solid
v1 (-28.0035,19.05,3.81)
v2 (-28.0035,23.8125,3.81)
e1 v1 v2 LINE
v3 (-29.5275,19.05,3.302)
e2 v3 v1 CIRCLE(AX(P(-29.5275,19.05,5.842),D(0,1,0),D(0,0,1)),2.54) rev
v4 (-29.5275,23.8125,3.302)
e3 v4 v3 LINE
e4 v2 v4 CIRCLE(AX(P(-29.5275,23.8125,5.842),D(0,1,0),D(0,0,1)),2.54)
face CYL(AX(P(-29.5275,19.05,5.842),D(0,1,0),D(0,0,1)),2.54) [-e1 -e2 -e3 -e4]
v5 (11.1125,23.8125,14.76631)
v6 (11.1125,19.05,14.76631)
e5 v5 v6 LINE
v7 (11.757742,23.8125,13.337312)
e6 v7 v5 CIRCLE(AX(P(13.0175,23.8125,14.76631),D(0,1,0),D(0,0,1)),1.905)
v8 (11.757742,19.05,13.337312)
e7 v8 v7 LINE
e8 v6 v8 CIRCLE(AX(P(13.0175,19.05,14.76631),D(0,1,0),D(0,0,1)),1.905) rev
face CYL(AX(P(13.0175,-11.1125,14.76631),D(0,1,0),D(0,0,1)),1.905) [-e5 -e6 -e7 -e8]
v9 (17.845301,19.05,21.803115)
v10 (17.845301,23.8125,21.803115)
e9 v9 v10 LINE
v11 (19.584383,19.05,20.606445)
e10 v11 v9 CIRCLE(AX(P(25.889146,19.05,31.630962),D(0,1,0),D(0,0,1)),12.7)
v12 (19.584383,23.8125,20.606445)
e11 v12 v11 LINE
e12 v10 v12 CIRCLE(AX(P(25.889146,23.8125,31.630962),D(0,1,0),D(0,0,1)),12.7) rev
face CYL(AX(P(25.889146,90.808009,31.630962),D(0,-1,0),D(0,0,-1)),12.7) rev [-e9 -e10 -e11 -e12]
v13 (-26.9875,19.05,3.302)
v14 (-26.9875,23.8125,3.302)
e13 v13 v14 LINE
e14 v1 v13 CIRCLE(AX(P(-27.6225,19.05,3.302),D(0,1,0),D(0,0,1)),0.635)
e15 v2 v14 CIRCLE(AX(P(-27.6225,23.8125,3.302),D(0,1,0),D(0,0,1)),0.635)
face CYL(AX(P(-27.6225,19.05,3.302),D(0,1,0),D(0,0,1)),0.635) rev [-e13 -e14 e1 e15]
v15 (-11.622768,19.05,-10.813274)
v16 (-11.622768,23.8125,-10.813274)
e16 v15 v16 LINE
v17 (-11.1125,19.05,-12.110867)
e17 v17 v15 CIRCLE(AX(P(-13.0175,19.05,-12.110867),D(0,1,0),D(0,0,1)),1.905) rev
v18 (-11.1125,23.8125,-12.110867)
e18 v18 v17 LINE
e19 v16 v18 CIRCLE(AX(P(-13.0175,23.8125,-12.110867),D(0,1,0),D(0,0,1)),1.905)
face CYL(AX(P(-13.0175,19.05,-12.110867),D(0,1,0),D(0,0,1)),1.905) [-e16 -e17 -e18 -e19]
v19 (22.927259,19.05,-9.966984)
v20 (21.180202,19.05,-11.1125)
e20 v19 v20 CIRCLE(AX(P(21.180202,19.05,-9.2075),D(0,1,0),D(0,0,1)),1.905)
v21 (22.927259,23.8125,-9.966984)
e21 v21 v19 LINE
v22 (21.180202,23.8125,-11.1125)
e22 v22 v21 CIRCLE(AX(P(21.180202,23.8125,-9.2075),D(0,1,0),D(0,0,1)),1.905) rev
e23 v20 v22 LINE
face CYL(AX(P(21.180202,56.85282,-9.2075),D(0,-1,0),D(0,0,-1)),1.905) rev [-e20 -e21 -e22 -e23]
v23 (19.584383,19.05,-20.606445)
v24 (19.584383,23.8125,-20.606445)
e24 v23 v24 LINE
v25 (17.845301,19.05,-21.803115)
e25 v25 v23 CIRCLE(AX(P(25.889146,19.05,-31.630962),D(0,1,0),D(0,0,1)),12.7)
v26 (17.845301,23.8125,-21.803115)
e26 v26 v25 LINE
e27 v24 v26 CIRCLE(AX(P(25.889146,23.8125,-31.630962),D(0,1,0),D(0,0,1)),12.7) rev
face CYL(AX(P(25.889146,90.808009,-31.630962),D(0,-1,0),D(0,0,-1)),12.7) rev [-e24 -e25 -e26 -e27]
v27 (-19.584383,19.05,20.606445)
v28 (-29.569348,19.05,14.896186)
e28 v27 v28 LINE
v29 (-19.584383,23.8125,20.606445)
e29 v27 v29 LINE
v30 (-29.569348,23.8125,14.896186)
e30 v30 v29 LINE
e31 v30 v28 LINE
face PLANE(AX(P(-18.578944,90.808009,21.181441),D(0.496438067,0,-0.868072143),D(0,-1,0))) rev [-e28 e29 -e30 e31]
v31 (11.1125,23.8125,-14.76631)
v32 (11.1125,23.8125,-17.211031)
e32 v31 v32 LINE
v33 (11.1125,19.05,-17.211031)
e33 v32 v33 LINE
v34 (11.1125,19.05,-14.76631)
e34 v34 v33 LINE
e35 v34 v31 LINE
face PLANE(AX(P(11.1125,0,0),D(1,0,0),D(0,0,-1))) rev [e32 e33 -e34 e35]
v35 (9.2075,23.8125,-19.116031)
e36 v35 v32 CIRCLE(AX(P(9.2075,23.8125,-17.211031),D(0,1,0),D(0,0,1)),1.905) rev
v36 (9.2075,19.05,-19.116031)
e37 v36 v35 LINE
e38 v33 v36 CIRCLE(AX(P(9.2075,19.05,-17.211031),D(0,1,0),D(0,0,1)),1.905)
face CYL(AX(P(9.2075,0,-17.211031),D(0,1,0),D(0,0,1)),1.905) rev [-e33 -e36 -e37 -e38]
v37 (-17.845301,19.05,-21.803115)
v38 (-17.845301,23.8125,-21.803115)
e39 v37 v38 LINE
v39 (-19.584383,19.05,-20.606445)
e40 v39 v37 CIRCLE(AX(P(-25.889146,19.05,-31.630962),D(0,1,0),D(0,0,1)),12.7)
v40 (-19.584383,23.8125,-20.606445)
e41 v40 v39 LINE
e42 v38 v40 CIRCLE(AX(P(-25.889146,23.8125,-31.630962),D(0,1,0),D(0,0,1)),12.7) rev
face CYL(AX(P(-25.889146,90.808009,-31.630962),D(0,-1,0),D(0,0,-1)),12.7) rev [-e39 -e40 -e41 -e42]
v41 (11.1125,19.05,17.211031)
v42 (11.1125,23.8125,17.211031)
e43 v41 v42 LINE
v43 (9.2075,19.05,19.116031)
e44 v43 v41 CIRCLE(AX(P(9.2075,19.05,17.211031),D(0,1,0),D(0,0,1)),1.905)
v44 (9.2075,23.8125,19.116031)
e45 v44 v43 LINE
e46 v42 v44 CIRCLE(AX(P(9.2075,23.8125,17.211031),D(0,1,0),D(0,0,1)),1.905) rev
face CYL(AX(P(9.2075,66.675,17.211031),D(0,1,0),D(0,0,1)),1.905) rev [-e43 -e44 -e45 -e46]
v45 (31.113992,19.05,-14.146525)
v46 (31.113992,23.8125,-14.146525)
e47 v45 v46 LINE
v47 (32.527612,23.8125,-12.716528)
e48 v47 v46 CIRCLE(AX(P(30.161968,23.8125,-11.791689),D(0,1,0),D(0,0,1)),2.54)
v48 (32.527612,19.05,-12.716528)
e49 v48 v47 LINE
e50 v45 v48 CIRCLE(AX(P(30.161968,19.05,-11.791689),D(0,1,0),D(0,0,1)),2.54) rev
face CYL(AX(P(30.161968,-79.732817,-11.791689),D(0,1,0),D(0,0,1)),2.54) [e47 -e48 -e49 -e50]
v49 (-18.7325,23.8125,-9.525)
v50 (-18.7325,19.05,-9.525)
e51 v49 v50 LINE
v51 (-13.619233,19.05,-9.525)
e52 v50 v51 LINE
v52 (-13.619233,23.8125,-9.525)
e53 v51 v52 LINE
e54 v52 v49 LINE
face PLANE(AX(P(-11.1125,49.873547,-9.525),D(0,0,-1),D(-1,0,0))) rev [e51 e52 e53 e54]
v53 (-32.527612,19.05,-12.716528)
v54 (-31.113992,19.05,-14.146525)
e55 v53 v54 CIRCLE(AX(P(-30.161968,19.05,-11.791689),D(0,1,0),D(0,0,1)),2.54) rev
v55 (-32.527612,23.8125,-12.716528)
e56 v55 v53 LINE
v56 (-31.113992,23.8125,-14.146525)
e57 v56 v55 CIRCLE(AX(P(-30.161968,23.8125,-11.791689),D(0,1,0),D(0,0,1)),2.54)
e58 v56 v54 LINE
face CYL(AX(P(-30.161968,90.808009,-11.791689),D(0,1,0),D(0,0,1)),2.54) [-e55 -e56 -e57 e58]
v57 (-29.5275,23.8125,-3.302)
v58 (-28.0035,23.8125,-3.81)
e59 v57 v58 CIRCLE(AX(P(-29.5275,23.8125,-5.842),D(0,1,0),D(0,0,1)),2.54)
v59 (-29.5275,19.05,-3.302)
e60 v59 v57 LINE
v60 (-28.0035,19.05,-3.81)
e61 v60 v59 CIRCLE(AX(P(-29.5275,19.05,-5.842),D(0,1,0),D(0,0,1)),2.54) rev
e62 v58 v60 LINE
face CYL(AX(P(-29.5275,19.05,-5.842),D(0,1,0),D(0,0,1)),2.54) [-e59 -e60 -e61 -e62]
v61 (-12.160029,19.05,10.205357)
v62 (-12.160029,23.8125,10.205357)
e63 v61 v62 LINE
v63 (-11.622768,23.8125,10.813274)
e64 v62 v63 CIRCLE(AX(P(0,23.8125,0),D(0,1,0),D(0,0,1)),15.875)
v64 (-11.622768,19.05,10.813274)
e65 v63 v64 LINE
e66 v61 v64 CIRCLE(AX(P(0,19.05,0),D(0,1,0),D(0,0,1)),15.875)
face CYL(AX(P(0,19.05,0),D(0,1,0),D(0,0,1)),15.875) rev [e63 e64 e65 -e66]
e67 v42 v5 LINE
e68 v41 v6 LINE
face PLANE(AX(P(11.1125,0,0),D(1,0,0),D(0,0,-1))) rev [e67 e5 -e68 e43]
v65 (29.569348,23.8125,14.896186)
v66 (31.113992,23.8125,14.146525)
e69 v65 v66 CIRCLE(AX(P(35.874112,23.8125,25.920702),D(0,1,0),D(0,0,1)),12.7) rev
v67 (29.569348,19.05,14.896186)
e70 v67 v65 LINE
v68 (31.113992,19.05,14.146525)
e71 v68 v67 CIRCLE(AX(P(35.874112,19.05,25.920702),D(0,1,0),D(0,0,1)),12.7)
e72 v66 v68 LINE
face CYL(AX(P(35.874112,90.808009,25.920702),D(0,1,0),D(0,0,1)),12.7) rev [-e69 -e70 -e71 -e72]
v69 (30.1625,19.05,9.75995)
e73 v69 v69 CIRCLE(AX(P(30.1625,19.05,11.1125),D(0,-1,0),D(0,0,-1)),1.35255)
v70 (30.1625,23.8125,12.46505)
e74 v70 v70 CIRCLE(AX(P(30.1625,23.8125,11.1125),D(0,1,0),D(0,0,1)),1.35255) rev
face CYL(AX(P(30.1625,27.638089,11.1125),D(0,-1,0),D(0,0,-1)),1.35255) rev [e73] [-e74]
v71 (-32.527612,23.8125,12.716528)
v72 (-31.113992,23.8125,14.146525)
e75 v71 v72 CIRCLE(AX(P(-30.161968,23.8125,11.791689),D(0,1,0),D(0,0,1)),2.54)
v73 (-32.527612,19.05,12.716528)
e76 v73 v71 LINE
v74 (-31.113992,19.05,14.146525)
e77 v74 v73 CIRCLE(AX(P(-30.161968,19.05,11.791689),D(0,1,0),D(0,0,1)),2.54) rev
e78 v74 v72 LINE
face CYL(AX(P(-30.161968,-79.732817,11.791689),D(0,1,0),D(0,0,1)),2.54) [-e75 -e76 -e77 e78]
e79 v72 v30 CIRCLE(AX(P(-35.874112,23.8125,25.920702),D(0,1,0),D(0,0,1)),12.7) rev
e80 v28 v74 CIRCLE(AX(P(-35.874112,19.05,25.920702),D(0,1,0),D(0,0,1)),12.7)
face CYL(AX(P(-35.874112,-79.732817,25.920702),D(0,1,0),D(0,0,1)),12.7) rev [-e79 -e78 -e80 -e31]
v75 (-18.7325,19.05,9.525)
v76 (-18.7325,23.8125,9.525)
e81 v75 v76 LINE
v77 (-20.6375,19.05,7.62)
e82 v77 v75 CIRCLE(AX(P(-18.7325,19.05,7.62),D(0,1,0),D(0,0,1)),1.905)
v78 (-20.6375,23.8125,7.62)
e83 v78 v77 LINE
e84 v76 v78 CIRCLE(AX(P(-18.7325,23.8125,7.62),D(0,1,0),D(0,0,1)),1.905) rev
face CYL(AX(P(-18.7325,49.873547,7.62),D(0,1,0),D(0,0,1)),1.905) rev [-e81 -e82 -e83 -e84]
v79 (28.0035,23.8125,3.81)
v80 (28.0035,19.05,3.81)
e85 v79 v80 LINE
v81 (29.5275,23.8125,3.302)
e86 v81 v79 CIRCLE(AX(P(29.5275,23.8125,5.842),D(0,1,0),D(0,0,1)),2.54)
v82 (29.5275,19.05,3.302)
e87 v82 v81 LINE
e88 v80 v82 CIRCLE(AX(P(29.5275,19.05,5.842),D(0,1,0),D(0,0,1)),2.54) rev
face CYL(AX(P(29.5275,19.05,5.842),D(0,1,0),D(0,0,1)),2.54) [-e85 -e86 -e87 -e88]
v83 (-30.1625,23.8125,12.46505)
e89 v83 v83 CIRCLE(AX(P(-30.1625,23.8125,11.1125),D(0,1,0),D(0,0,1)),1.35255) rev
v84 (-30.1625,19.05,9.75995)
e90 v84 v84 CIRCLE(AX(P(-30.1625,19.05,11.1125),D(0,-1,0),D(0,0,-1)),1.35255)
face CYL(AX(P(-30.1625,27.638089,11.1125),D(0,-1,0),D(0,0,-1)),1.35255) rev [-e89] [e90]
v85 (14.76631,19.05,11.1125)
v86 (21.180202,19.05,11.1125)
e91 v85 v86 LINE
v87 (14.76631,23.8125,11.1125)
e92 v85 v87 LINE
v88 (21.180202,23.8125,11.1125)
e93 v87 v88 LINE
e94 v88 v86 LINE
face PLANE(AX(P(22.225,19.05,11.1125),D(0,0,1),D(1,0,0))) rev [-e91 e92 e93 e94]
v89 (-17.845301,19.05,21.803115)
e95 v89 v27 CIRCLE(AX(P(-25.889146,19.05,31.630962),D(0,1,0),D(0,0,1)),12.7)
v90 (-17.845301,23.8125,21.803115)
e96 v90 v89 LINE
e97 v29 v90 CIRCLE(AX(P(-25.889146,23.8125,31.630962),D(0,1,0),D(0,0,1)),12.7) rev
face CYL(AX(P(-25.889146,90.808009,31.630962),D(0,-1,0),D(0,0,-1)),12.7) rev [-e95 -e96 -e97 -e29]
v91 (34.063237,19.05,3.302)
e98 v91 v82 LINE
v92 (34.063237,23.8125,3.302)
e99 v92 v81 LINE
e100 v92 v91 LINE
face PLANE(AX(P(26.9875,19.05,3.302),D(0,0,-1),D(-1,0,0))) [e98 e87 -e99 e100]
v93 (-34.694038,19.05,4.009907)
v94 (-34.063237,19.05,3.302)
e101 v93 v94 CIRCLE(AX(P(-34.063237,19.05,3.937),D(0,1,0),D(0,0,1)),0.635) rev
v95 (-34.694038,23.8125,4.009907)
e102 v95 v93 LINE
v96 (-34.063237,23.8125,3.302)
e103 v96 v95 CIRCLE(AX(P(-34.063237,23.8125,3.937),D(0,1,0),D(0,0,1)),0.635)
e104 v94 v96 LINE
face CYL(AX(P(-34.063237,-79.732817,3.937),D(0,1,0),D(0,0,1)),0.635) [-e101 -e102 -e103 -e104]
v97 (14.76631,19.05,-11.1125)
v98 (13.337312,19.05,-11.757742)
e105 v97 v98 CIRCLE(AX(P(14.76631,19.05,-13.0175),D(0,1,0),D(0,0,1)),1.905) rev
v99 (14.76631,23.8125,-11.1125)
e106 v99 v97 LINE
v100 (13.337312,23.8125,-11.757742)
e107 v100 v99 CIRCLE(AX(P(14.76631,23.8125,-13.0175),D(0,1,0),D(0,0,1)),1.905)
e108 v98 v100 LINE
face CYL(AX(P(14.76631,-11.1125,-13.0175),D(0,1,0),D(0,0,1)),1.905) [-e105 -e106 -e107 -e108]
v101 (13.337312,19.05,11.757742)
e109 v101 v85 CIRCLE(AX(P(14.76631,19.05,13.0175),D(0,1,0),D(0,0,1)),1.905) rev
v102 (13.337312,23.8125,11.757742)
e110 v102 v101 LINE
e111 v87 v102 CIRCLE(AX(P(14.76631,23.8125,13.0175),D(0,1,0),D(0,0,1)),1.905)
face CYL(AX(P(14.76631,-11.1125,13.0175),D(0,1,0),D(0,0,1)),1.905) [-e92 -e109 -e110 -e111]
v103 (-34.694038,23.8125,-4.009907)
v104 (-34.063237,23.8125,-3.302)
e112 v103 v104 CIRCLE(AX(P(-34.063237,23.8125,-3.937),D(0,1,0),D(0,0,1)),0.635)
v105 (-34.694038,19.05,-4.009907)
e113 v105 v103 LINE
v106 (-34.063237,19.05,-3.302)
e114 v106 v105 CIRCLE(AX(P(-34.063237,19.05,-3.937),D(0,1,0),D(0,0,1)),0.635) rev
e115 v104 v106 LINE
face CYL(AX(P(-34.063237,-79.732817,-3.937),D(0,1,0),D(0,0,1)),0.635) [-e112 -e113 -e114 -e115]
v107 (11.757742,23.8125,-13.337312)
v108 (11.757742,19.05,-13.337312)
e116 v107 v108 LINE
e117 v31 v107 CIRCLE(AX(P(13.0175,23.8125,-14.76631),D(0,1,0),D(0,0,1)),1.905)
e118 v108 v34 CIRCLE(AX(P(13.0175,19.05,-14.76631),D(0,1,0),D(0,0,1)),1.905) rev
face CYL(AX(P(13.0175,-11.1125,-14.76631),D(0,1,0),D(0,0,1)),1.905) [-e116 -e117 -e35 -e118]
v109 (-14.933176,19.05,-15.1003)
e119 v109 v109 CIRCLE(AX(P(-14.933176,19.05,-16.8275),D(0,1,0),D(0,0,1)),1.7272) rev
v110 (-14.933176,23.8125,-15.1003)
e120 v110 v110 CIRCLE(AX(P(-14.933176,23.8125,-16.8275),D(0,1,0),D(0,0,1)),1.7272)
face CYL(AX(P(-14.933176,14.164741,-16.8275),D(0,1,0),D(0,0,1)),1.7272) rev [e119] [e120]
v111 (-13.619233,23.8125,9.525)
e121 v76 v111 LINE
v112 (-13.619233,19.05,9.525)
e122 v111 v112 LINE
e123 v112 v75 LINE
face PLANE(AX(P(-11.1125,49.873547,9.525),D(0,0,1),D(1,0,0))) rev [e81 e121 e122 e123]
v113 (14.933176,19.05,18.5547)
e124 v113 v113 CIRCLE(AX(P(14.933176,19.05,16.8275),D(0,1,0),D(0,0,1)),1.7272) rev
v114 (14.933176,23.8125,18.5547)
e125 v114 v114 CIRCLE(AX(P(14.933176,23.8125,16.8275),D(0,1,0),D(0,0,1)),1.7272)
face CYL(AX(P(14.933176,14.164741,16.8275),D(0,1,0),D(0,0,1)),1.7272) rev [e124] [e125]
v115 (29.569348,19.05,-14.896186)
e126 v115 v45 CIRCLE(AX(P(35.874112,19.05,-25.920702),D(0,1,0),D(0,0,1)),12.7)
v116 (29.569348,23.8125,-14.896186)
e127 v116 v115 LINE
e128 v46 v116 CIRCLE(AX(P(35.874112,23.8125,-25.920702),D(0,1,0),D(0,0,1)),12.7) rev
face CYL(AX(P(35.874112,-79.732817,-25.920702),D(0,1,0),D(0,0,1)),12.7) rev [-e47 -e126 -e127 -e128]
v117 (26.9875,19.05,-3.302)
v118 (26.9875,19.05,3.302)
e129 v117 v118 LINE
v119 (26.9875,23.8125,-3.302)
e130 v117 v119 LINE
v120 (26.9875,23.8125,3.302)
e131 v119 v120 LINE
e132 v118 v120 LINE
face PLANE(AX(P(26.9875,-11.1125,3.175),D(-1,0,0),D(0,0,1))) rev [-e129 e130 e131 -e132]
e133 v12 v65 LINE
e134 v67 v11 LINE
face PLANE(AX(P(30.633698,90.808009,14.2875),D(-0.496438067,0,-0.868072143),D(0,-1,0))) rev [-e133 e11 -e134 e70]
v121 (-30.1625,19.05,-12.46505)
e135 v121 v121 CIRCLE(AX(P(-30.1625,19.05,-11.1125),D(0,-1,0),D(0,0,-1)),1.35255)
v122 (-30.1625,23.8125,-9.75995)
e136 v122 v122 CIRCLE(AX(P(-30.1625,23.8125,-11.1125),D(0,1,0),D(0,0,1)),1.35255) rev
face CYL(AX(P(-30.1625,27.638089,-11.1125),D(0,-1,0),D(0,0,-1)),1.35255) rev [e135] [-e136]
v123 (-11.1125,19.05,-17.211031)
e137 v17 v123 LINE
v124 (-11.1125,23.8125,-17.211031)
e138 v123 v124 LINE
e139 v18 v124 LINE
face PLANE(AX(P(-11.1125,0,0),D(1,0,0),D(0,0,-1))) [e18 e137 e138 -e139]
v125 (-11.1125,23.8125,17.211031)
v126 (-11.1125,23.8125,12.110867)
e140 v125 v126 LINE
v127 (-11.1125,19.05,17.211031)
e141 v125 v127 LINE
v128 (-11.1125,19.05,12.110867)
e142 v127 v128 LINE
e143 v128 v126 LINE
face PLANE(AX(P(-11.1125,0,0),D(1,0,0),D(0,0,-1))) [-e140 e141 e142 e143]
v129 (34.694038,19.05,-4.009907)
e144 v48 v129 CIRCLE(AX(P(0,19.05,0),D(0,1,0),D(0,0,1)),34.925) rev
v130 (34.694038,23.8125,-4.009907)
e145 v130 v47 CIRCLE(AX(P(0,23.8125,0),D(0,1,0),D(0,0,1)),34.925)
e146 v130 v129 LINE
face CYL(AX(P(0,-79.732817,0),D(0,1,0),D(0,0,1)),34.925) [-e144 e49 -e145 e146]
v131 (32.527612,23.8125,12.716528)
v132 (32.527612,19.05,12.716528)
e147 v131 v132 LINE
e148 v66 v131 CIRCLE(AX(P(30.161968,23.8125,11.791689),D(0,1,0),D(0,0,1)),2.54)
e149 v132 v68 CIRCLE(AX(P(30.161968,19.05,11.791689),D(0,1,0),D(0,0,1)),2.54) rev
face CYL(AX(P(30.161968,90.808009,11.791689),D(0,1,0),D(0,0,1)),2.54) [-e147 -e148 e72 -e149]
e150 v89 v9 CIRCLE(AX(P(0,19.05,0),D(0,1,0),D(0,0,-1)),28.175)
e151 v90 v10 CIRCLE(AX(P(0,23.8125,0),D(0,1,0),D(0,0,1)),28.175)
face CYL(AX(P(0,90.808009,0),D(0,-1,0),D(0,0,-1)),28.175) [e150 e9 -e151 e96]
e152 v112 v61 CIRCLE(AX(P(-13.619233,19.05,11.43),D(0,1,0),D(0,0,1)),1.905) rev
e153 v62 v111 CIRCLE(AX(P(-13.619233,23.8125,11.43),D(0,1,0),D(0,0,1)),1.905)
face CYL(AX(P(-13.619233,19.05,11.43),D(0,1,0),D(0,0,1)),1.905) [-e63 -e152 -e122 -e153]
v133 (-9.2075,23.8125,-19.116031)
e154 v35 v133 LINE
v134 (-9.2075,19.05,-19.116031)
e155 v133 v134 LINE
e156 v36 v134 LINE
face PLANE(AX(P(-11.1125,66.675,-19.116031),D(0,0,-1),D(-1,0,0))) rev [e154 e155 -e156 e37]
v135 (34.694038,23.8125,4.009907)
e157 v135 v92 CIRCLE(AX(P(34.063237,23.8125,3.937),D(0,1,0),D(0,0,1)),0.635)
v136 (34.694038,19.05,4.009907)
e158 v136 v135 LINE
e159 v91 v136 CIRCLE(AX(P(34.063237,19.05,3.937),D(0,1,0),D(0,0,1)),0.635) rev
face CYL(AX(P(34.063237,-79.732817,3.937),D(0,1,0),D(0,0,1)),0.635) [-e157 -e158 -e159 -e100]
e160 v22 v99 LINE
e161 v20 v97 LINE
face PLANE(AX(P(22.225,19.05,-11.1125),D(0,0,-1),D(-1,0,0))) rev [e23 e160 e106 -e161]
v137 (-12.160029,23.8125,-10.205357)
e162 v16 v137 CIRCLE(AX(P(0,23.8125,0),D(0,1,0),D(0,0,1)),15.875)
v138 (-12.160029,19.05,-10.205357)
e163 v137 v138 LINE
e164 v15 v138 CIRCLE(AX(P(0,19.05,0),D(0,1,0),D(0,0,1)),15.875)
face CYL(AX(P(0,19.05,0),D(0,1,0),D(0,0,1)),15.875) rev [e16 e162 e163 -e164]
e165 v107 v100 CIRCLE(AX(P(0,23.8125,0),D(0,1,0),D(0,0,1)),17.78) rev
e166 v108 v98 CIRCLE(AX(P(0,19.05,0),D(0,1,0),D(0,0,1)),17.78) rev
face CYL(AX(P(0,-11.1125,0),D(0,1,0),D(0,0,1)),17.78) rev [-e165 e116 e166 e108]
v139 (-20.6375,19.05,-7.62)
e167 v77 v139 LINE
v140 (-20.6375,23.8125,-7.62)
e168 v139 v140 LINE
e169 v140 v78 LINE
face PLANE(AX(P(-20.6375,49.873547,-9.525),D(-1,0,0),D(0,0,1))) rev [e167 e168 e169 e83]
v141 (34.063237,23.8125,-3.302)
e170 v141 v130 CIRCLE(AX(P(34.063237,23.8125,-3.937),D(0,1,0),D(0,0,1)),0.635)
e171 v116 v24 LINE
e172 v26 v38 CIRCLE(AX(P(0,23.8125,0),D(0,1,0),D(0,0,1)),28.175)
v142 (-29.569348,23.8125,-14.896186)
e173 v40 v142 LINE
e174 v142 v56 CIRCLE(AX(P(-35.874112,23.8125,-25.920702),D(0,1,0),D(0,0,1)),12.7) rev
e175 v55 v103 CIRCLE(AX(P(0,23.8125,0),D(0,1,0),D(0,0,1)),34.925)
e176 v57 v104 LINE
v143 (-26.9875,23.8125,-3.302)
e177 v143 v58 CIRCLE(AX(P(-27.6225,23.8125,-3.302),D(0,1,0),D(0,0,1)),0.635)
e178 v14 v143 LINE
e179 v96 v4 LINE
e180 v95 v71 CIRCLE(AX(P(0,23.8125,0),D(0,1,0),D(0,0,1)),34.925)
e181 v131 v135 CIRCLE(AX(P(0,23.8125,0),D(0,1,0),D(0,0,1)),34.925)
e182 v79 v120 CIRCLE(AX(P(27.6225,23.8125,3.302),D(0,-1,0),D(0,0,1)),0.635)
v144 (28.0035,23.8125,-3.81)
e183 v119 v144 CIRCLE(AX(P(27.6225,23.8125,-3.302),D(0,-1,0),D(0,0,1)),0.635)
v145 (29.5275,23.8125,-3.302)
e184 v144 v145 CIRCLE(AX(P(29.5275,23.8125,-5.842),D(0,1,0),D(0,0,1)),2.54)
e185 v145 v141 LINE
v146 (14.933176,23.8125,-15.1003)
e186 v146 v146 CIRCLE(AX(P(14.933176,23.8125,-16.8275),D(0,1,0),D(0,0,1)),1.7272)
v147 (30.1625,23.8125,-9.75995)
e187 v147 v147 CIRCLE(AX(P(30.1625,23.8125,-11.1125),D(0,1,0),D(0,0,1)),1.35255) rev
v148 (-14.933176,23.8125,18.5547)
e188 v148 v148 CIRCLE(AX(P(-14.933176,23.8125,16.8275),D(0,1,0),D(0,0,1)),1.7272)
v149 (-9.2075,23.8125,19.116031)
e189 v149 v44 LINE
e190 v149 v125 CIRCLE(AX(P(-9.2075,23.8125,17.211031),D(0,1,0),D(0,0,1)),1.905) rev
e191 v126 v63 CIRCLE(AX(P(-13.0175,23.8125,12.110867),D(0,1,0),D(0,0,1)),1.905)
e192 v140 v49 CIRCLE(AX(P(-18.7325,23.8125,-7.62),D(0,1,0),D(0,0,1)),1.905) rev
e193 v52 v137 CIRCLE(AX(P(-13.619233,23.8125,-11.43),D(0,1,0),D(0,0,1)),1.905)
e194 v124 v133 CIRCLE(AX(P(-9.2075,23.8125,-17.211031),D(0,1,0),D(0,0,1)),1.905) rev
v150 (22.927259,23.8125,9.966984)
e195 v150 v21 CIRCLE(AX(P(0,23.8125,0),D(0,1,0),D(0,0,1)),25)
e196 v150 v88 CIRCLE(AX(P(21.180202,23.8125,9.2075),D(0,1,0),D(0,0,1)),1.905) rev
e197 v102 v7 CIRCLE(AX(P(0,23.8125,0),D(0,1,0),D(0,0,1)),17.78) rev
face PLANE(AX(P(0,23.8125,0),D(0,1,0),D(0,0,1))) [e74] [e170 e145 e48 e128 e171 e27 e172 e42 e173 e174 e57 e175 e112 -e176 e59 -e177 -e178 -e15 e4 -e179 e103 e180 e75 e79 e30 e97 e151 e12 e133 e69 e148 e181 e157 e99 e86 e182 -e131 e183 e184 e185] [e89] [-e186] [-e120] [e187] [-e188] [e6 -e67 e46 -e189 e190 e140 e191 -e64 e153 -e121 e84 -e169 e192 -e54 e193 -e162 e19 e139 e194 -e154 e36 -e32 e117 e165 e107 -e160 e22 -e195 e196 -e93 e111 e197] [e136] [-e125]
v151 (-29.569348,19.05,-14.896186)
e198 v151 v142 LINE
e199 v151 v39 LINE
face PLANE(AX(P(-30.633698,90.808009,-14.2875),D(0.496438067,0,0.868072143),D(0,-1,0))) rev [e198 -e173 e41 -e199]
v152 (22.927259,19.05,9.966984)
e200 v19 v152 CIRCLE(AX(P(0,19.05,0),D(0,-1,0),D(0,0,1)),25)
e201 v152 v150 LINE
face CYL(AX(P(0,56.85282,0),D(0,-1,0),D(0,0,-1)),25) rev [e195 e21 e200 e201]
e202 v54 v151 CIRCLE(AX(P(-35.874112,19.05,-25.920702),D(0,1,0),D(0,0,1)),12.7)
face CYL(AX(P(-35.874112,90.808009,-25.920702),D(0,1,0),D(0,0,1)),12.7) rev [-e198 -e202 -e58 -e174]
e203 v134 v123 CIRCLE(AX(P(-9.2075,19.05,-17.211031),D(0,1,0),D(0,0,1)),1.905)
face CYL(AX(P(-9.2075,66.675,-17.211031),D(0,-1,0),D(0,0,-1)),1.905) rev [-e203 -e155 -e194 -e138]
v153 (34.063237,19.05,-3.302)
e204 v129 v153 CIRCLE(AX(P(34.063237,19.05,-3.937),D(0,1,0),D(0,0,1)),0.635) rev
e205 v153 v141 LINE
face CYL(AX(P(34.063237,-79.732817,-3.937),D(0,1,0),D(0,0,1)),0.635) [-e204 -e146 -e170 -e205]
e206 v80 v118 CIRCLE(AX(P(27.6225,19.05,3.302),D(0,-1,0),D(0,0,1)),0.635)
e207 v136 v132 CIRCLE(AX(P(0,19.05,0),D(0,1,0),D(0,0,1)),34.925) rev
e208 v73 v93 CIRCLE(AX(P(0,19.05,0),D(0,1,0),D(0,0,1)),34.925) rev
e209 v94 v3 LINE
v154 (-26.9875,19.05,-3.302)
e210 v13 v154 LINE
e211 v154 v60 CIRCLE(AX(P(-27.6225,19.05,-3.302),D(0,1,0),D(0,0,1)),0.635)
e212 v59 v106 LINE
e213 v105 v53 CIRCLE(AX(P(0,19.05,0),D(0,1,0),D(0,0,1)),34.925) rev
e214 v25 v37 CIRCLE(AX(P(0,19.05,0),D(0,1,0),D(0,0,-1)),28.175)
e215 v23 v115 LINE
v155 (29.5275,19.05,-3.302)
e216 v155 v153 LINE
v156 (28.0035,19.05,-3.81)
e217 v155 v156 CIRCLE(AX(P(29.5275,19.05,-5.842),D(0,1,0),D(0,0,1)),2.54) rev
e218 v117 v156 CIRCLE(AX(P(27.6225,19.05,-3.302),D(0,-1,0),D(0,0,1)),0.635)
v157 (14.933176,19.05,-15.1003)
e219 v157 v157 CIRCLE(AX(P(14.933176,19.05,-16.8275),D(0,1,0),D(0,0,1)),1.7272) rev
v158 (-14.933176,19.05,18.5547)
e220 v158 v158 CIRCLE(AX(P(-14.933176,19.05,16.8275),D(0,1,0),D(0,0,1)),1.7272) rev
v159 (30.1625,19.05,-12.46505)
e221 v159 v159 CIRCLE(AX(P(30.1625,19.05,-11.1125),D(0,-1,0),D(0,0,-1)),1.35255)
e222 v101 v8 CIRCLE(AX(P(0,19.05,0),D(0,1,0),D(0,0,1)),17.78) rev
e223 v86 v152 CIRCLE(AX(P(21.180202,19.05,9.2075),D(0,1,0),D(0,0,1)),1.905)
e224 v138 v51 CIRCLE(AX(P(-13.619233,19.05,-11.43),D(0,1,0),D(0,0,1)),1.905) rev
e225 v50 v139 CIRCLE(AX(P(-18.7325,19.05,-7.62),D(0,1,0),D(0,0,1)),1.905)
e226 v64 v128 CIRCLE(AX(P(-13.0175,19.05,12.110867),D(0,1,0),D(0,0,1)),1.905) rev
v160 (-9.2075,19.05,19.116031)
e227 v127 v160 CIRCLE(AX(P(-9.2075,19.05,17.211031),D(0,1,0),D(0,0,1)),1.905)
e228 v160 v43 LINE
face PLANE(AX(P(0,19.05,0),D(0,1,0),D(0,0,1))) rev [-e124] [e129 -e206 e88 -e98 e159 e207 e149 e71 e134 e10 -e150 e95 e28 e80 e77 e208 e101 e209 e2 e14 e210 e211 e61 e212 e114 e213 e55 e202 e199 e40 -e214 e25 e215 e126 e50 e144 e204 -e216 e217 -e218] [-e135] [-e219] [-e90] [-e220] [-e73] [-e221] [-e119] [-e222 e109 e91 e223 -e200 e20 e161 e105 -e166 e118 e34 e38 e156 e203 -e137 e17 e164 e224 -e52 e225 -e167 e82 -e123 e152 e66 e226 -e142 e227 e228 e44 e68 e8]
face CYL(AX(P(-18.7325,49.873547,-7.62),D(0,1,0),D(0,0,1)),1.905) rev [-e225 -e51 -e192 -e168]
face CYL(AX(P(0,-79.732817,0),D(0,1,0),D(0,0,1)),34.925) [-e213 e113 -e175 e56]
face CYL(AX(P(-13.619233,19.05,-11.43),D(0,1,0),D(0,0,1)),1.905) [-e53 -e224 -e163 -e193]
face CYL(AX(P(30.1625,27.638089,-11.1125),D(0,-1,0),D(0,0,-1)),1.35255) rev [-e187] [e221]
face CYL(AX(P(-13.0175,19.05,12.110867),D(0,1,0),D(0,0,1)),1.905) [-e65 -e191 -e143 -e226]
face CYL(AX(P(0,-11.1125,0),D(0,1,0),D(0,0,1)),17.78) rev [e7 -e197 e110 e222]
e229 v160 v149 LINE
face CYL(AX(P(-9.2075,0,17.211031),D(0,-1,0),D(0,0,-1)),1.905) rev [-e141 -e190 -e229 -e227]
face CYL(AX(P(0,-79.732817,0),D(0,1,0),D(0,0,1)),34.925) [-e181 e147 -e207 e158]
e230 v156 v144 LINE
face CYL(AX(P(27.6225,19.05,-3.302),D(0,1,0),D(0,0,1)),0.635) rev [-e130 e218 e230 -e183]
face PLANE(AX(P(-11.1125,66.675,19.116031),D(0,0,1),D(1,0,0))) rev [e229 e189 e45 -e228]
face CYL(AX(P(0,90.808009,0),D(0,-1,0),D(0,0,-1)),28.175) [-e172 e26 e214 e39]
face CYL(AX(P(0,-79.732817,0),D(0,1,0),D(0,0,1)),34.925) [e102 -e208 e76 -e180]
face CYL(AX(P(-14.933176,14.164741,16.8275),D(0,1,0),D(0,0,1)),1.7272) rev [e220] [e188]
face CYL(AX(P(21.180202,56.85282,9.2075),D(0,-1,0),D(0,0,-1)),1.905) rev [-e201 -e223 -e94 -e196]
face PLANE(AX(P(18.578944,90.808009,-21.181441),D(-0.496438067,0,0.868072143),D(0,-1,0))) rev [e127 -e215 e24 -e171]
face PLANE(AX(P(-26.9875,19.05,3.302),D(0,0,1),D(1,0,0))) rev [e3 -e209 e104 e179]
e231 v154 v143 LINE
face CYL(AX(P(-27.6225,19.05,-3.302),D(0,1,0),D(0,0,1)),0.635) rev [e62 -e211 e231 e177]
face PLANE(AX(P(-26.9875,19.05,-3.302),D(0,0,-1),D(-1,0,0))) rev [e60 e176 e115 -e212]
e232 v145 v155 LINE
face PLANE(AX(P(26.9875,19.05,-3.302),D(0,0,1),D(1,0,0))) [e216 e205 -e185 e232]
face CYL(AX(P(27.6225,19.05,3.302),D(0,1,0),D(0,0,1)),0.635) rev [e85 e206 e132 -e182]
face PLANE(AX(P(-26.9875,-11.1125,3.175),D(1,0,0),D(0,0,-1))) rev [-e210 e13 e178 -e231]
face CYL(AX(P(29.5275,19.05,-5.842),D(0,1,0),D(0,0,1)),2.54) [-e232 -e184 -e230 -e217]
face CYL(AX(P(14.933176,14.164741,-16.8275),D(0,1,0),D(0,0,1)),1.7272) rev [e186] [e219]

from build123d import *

# Parameters (mm, degrees)
STOCK_DGT_START                               = 19.05
STOCK_DGT_INSIDE_SWERVE_STRUCTURE_SM_2_R      = 1.7272
STOCK_DGT_INSIDE_SWERVE_STRUCTURE_SM_2_R_2    = 1.35255
STOCK_DGT_INSIDE_SWERVE_STRUCTURE_SMALL_DEPTH = 4.7625
SKETCH2_W                                     = 7.792882402
SKETCH2_H                                     = 6.604
CUT_EXTRUDE2_DEPTH                            = 46.013187304
CUT_EXTRUDE1_DEPTH                            = 46.013187304
FILLET1_R                                     = 2.54
FILLET2_R                                     = 2.54
FILLET3_R                                     = 12.7
FILLET4_R                                     = 1.905
FILLET5_R                                     = 0.635


# Read off the part's stored shape, not the designer's step: Stock-DGT inside swerve structure Small Bearing-1
with BuildPart() as part:
    # Stock-DGT inside swerve structure Sm 2 → Stock-DGT inside swerve structure Small Bearing-1 (new body)
    with BuildSketch(Plane(origin=(0, 0, 0), x_dir=(1, 0, 0), z_dir=(0, 1, 0)).offset(STOCK_DGT_START)):
        with BuildLine():
            Line((26.9875, 3.175), (34.780382402, 3.175))
            ThreePointArc((34.780382402, 3.175), (33.784635987, 8.851779269), (31.868840091, 14.2875))
            Line((31.868840091, 14.2875), (30.633697592, 14.2875))
            Line((30.633697592, 14.2875), (18.578944076, 21.181441452))
            ThreePointArc((18.578944076, 21.181441452), (0, 28.175), (-18.578944076, 21.181441452))
            Line((-18.578944076, 21.181441452), (-30.633697592, 14.2875))
            Line((-30.633697592, 14.2875), (-31.868840091, 14.2875))
            ThreePointArc((-31.868840091, 14.2875), (-33.784635987, 8.851779269), (-34.780382402, 3.175))
            Line((-34.780382402, 3.175), (-26.9875, 3.175))
            Line((-26.9875, 3.175), (-26.9875, -3.175))
            Line((-26.9875, -3.175), (-34.780382402, -3.175))
            ThreePointArc((-34.780382402, -3.175), (-33.784635987, -8.851779269), (-31.868840091, -14.2875))
            Line((-31.868840091, -14.2875), (-30.633697592, -14.2875))
            Line((-30.633697592, -14.2875), (-18.578944076, -21.181441452))
            ThreePointArc((-18.578944076, -21.181441452), (0, -28.175), (18.578944076, -21.181441452))
            Line((18.578944076, -21.181441452), (30.633697592, -14.2875))
            Line((30.633697592, -14.2875), (31.868840091, -14.2875))
            ThreePointArc((31.868840091, -14.2875), (33.784635987, -8.851779269), (34.780382402, -3.175))
            Line((34.780382402, -3.175), (26.9875, -3.175))
            Line((26.9875, -3.175), (26.9875, 3.175))
        make_face()
        with Locations((-14.933176064, -16.8275)):
            Circle(STOCK_DGT_INSIDE_SWERVE_STRUCTURE_SM_2_R, mode=Mode.SUBTRACT)
        with Locations((-30.1625, -11.1125)):
            Circle(STOCK_DGT_INSIDE_SWERVE_STRUCTURE_SM_2_R_2, mode=Mode.SUBTRACT)
        with Locations((14.933176064, -16.8275)):
            Circle(STOCK_DGT_INSIDE_SWERVE_STRUCTURE_SM_2_R, mode=Mode.SUBTRACT)
        with Locations((30.1625, -11.1125)):
            Circle(STOCK_DGT_INSIDE_SWERVE_STRUCTURE_SM_2_R_2, mode=Mode.SUBTRACT)
        with Locations((-30.1625, 11.1125)):
            Circle(STOCK_DGT_INSIDE_SWERVE_STRUCTURE_SM_2_R_2, mode=Mode.SUBTRACT)
        with Locations((-14.933176064, 16.8275)):
            Circle(STOCK_DGT_INSIDE_SWERVE_STRUCTURE_SM_2_R, mode=Mode.SUBTRACT)
        with BuildLine():
            Line((22.394471276, -11.1125), (13.879508051, -11.1125))
            ThreePointArc((13.879508051, -11.1125), (12.572358569, -12.572358569), (11.1125, -13.879508051))
            Line((11.1125, -13.879508051), (11.1125, -19.116031394))
            Line((11.1125, -19.116031394), (-11.1125, -19.116031394))
            Line((-11.1125, -19.116031394), (-11.1125, -11.33701763))
            ThreePointArc((-11.1125, -11.33701763), (-11.940671716, -10.461165517), (-12.7, -9.525))
            Line((-12.7, -9.525), (-20.6375, -9.525))
            Line((-20.6375, -9.525), (-20.6375, 9.525))
            Line((-20.6375, 9.525), (-12.7, 9.525))
            ThreePointArc((-12.7, 9.525), (-11.940671716, 10.461165517), (-11.1125, 11.33701763))
            Line((-11.1125, 11.33701763), (-11.1125, 19.116031394))
            Line((-11.1125, 19.116031394), (11.1125, 19.116031394))
            Line((11.1125, 19.116031394), (11.1125, 13.879508051))
            ThreePointArc((11.1125, 13.879508051), (12.572358569, 12.572358569), (13.879508051, 11.1125))
            Line((13.879508051, 11.1125), (22.394471276, 11.1125))
            ThreePointArc((22.394471276, 11.1125), (25, 0), (22.394471276, -11.1125))
        make_face(mode=Mode.SUBTRACT)
        with Locations((30.1625, 11.1125)):
            Circle(STOCK_DGT_INSIDE_SWERVE_STRUCTURE_SM_2_R_2, mode=Mode.SUBTRACT)
        with Locations((14.933176064, 16.8275)):
            Circle(STOCK_DGT_INSIDE_SWERVE_STRUCTURE_SM_2_R, mode=Mode.SUBTRACT)
    extrude(amount=STOCK_DGT_INSIDE_SWERVE_STRUCTURE_SMALL_DEPTH)

    # Sketch2 → Cut-Extrude2 (cut, through all)
    with BuildSketch(Plane(origin=(0, 23.8125, 0), x_dir=(1, 0, 0), z_dir=(0, 1, 0))):
        with Locations((-30.883941201, 0)):
            Rectangle(SKETCH2_W, SKETCH2_H)
    cut_extrude2 = extrude(amount=-CUT_EXTRUDE2_DEPTH, mode=Mode.SUBTRACT)

    # Sketch1 → Cut-Extrude1 (cut, through all)
    with BuildSketch(Plane(origin=(0, 23.8125, 0), x_dir=(1, 0, 0), z_dir=(0, 1, 0))):
        with BuildLine():
            Line((-28.2575, -3.302), (-28.2575, 3.302))
            ThreePointArc((-28.2575, 3.302), (-27.6225, 3.937), (-26.9875, 3.302))
            Line((-26.9875, 3.302), (-26.9875, -3.302))
            ThreePointArc((-26.9875, -3.302), (-27.6225, -3.937), (-28.2575, -3.302))
        make_face()
    cut_extrude1 = extrude(amount=-CUT_EXTRUDE1_DEPTH, mode=Mode.SUBTRACT)

    # Mirror1: Cut-Extrude2, Cut-Extrude1 across plane
    add(cut_extrude2.mirror(Plane(origin=(0, 0, 0), x_dir=(0, 0, 1), z_dir=(1, 0, 0))), mode=Mode.SUBTRACT)
    add(cut_extrude1.mirror(Plane(origin=(0, 0, 0), x_dir=(0, 0, 1), z_dir=(1, 0, 0))), mode=Mode.SUBTRACT)

    # Fillet1
    fillet1_edges = [part.edges().sort_by_distance(p)[0] for p in [
        (-28.2575, 21.43125, 3.302),
        (-28.2575, 21.43125, -3.302),
        (28.2575, 21.43125, 3.302),
        (28.2575, 21.43125, -3.302),
    ]]
    fillet(fillet1_edges, radius=FILLET1_R)

    # Fillet2
    # the kernel refuses this fillet: 2.54 mm, written as the material it takes off along each edge
    with BuildSketch(Plane(origin=(31.868840091, 14.791233758, -14.2875), x_dir=(-1, 0, 0), z_dir=(0, 1, 0))) as fillet2_piece_1:
        with BuildLine():
            CenterArc((1.70687253, 2.495810645), FILLET2_R, 201.352796162, 57.94406273)
            Line((-0.658771985, 1.570972265), (-0.706084875, 1.552475497))
            ThreePointArc((-0.706084875, 1.552475497), (-0.385813379, 0.761823855), (-0.046354676, -0.020781818))
            Line((-0.046354676, -0.020781818), (0, -0.0508))
            ThreePointArc((0, -0.0508), (0.61757125, -0.0508), (1.225707898, -0.049916213))
            Line((1.225707898, -0.049916213), (1.235142499, 0))
        make_face()
    extrude(amount=13.280032484, mode=Mode.SUBTRACT)
    with BuildSketch(Plane(origin=(31.868840091, 14.791233758, 14.2875), x_dir=(-1, 0, 0), z_dir=(0, 1, 0))) as fillet2_piece_2:
        with BuildLine():
            CenterArc((1.70687253, -2.495810645), FILLET2_R, 100.703141108, 57.94406273)
            Line((-0.658771985, -1.570972265), (-0.706084875, -1.552475497))
            ThreePointArc((-0.706084875, -1.552475497), (-0.385813379, -0.761823855), (-0.046354676, 0.020781818))
            Line((-0.046354676, 0.020781818), (0, 0.0508))
            ThreePointArc((0, 0.0508), (0.61757125, 0.0508), (1.225707898, 0.049916213))
            Line((1.225707898, 0.049916213), (1.235142499, 0))
        make_face()
    extrude(amount=13.280032484, mode=Mode.SUBTRACT)
    with BuildSketch(Plane(origin=(-31.868840091, 14.791233758, 14.2875), x_dir=(-0.3867152758408876, 0, -0.9221991625626789), z_dir=(0, 1, 0))) as fillet2_piece_3:
        with BuildLine():
            CenterArc((1.641560806, -2.53924452), FILLET2_R, 88.602528123, 57.94406273)
            Line((-0.477648472, -1.139047378), (-0.520032658, -1.111043435))
            ThreePointArc((-0.520032658, -1.111043435), (-0.285671954, -0.549878553), (-0.046847717, 0.019645136))
            Line((-0.046847717, 0.019645136), (-0.001238914, 0.05078489))
            ThreePointArc((-0.001238914, 0.05078489), (0.851753248, 0.061187853), (1.704745411, 0.05078489))
            Line((1.704745411, 0.05078489), (1.703506497, 0))
        make_face()
    extrude(amount=13.280032484, mode=Mode.SUBTRACT)
    with BuildSketch(Plane(origin=(-31.868840091, 14.791233758, -14.2875), x_dir=(-0.3867152758408886, 0, 0.9221991625626784), z_dir=(0, 1, 0))) as fillet2_piece_4:
        with BuildLine():
            CenterArc((1.641560806, 2.53924452), FILLET2_R, 213.453409147, 57.94406273)
            Line((-0.477648472, 1.139047378), (-0.520032658, 1.111043435))
            ThreePointArc((-0.520032658, 1.111043435), (-0.285671954, 0.549878553), (-0.046847717, -0.019645136))
            Line((-0.046847717, -0.019645136), (-0.001238914, -0.05078489))
            ThreePointArc((-0.001238914, -0.05078489), (0.851753248, -0.061187853), (1.704745411, -0.05078489))
            Line((1.704745411, -0.05078489), (1.703506497, 0))
        make_face()
    extrude(amount=13.280032484, mode=Mode.SUBTRACT)

    # Fillet3
    fillet3_edges = [part.edges().sort_by_distance(p)[0] for p in [
        (-18.578944076, 21.43125, -21.181441452),
        (18.578944076, 21.43125, -21.181441452),
        (30.633697592, 21.43125, -14.2875),
        (-30.633697592, 21.43125, -14.2875),
        (30.633697592, 21.43125, 14.2875),
        (-18.578944076, 21.43125, 21.181441452),
        (18.578944076, 21.43125, 21.181441452),
        (-30.633697592, 21.43125, 14.2875),
    ]]
    fillet(fillet3_edges, radius=FILLET3_R)

    # Fillet4
    fillet4_edges = [part.edges().sort_by_distance(p)[0] for p in [
        (11.1125, 21.43125, 19.116031394),
        (-11.1125, 21.43125, -19.116031394),
        (11.1125, 21.43125, -19.116031394),
        (-11.1125, 21.43125, 19.116031394),
        (-12.7, 21.43125, -9.525),
        (-12.7, 21.43125, 9.525),
        (-20.6375, 21.43125, 9.525),
        (-20.6375, 21.43125, -9.525),
        (22.394471276, 21.43125, 11.1125),
        (22.394471276, 21.43125, -11.1125),
        (11.1125, 21.43125, -13.879508051),
        (11.1125, 21.43125, 13.879508051),
        (13.879508051, 21.43125, 11.1125),
        (13.879508051, 21.43125, -11.1125),
        (-11.1125, 21.43125, 11.33701763),
        (-11.1125, 21.43125, -11.33701763),
    ]]
    fillet(fillet4_edges, radius=FILLET4_R)

    # Fillet5
    fillet5_edges = [part.edges().sort_by_distance(p)[0] for p in [
        (-34.768555061, 21.43125, 3.302),
        (-34.768555061, 21.43125, -3.302),
        (34.768555061, 21.43125, 3.302),
        (34.768555061, 21.43125, -3.302),
    ]]
    fillet(fillet5_edges, radius=FILLET5_R)


solid = part.part
